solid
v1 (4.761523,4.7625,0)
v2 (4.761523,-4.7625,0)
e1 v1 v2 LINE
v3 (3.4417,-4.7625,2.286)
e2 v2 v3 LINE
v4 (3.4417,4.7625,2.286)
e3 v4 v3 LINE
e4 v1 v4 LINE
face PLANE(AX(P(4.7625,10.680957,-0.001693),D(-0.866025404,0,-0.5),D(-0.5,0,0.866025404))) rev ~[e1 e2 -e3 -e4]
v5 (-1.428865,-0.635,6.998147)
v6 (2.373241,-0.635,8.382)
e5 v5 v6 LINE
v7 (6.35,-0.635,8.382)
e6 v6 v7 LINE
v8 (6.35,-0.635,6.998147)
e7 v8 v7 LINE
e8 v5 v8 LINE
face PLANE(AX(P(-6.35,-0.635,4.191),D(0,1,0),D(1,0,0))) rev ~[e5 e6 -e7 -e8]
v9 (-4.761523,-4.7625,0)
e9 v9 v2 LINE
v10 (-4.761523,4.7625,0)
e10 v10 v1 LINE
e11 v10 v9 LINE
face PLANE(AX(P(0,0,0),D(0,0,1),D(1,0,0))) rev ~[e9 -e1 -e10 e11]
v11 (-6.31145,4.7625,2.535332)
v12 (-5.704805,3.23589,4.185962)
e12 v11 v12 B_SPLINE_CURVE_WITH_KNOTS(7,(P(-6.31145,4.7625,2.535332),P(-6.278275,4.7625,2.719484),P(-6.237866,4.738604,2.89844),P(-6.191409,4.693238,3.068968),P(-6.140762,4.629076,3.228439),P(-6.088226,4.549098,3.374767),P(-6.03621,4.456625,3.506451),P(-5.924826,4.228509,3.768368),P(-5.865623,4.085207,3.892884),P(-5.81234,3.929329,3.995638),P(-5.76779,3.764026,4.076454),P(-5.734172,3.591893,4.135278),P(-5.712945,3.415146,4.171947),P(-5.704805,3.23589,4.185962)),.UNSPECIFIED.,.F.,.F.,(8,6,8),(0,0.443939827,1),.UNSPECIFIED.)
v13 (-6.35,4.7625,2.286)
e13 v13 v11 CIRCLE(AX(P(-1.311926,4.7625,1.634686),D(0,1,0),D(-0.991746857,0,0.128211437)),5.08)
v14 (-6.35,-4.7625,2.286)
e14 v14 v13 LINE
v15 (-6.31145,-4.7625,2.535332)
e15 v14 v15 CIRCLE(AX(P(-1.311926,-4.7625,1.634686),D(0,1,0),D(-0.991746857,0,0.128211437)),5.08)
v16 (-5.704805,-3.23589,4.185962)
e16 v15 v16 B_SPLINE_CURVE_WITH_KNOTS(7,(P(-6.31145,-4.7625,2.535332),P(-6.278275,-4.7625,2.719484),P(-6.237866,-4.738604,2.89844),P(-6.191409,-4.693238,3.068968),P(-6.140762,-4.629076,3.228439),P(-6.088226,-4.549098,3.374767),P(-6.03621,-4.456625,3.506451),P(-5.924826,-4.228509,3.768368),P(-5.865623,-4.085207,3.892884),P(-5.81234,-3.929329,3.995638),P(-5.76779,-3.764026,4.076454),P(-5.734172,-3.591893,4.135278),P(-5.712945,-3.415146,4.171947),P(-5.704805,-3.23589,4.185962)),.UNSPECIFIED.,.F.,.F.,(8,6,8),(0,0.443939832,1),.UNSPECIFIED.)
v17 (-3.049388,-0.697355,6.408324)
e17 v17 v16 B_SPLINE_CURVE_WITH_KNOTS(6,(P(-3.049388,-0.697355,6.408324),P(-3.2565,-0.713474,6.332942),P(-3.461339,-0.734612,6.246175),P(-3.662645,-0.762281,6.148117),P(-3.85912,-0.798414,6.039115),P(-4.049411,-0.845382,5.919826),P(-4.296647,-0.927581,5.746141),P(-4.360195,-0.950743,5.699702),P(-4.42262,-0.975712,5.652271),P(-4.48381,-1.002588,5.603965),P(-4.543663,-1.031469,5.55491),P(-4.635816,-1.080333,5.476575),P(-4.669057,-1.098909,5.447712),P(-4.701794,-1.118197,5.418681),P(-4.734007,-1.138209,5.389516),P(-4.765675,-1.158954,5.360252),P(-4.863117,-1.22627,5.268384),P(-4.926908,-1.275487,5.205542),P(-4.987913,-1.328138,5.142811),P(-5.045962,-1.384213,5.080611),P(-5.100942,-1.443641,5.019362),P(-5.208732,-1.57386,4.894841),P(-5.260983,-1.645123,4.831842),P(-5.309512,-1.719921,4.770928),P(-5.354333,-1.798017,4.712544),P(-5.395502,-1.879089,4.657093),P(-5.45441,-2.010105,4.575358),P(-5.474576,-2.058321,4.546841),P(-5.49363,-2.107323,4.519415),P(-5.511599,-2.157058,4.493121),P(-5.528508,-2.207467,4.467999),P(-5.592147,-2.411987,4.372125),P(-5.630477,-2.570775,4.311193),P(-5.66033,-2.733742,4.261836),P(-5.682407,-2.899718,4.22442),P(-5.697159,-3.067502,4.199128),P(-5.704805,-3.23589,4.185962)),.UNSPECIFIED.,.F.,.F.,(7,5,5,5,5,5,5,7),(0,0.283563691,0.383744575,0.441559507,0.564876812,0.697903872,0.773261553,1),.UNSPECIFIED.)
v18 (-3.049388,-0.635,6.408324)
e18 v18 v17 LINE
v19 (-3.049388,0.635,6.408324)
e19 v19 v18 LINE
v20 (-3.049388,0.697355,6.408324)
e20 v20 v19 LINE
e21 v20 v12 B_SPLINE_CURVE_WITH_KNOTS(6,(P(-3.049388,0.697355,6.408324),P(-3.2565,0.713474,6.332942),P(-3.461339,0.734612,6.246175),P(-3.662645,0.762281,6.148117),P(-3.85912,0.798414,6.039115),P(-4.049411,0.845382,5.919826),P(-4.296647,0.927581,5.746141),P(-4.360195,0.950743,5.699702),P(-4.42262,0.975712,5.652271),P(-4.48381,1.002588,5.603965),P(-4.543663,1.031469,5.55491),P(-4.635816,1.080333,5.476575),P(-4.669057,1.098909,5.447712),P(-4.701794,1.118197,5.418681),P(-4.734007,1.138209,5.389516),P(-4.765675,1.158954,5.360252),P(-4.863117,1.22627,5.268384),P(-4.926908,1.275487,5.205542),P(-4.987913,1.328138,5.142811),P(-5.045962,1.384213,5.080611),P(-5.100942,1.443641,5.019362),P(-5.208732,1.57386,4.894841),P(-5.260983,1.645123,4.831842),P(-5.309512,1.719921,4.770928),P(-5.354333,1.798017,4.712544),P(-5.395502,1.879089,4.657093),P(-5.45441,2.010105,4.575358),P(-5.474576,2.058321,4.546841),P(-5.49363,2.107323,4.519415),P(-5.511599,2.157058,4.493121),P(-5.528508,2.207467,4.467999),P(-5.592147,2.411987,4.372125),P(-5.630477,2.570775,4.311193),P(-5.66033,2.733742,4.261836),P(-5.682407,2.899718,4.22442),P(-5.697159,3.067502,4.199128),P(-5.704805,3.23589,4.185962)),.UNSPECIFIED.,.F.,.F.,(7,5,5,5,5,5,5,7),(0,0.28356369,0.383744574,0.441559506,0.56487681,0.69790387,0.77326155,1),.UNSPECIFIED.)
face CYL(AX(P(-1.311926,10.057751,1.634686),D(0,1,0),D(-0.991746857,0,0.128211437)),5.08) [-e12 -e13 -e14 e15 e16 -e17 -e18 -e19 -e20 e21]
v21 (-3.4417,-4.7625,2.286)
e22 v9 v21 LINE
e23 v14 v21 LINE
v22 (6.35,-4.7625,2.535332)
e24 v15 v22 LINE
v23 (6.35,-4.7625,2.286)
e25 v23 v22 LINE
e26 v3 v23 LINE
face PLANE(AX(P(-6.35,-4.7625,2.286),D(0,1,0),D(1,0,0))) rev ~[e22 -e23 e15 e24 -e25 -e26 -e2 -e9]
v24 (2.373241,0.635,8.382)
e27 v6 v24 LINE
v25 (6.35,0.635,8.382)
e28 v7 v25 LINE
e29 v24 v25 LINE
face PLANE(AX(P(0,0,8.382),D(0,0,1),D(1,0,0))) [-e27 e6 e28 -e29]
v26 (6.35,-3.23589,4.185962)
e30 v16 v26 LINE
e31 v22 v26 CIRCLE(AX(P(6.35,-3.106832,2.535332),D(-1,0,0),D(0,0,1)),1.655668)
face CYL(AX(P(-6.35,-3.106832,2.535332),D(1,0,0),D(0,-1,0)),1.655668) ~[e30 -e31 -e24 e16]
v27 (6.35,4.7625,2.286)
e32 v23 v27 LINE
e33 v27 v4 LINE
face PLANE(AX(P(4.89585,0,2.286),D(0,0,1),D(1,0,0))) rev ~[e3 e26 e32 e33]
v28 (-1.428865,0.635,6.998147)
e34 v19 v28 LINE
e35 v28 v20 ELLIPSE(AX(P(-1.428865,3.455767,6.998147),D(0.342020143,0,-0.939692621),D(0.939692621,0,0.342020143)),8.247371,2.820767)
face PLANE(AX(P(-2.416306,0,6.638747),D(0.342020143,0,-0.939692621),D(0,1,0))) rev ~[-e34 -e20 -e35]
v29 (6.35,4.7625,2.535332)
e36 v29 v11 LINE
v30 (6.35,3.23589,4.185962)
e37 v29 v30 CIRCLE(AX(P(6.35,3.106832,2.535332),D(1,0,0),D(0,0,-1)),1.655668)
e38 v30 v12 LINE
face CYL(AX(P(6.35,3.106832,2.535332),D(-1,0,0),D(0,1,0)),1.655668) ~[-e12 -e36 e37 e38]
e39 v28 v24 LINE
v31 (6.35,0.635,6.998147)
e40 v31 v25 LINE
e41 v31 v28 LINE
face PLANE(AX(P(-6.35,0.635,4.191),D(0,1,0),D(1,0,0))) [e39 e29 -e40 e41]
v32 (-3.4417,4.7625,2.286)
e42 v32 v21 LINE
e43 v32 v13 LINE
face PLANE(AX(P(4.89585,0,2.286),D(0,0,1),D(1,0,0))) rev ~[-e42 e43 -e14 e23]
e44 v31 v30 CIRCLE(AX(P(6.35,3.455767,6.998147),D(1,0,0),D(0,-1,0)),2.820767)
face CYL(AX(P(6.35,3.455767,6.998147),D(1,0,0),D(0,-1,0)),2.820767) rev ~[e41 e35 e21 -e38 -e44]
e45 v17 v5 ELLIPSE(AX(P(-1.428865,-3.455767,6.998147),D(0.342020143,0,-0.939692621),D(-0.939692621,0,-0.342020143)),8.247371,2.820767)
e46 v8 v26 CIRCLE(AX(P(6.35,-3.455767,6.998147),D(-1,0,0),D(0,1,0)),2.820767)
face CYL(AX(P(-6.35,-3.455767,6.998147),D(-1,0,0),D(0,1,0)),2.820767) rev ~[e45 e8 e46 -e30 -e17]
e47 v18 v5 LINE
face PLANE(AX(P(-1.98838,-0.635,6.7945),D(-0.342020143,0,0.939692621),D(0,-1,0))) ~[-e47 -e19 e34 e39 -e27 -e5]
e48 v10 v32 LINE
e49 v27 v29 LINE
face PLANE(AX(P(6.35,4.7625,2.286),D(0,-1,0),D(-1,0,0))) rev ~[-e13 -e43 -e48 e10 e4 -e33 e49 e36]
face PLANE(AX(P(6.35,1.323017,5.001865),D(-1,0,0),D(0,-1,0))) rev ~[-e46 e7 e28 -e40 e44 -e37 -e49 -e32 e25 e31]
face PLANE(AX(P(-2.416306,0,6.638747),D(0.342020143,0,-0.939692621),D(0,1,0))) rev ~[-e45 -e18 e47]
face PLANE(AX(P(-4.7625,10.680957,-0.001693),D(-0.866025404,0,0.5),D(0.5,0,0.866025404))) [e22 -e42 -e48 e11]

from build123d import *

# Parameters (mm, degrees)
F0_W         = 9.525
F0_H         = 9.525
F1_DEPTH     = 2.286
F2_T1_DEPTH  = 21.3619144247
F3_W         = 2.9083
F3_H         = 9.525
F3_W_2       = 6.8834
F4_DEPTH     = 1.905
F5_R         = 1.6556676611
F6_W         = 12.7
F6_H         = 1.27
F7_DEPTH     = 4.191
F8_SIZE2     = 8.7232408068
F8_SIZE      = 3.175
F9_T4_DEPTH  = 12.7
F9_T9_DEPTH  = 12.7
F10_T1_DEPTH = 20.1155023365


# Not quite as in the source:
# - a fillet or chamfer that OpenCascade refuses, or shapes differently, is made with other operations: its cross-section is extruded or revolved along the edge and cut away or added


with BuildPart() as f1:
    # F0 (on Top) → F1 (new body)
    with BuildSketch(Plane.XY):
        Rectangle(F0_W, F0_H)
    extrude(amount=F1_DEPTH)

    # F2: chamfer of 1.3208 x 2.2876927066 on 2 edges, made by hand

    # F2_s2 → F2_t1 (cut)
    with BuildSketch(Plane.XZ.offset(-10.6809572123)):
        Polygon((-4.7625, -0.0016927066), (-3.4417, 2.286), (-4.7625, 2.286), align=None)
        Polygon((4.7625, -0.0016927066), (3.4417, 2.286), (4.7625, 2.286), align=None)
    extrude(amount=F2_T1_DEPTH, mode=Mode.SUBTRACT)

    # F3 (on face) → F4 (join)
    with BuildSketch(Plane.XY.offset(2.286)):
        with Locations((4.89585, 0)):
            Rectangle(F3_W, F3_H)
        Rectangle(F3_W_2, F3_H)
        with Locations((-4.89585, 0)):
            Rectangle(F3_W, F3_H)
    extrude(amount=F4_DEPTH)

    # F5
    f5_edges = [f1.edges().sort_by_distance(p)[0] for p in [
        (0, 4.7625, 4.191),
        (0, -4.7625, 4.191),
    ]]
    fillet(f5_edges, radius=F5_R)

    # F6 (on face) → F7 (join)
    with BuildSketch(Plane.XY.offset(4.191)):
        Rectangle(F6_W, F6_H)
    extrude(amount=F7_DEPTH)

    # F8
    f8_edges = [f1.edges().sort_by_distance(p)[0] for p in [
        (-6.35, 0, 8.382),
    ]]
    f8_side = f1.faces().sort_by_distance((-6.35, 0, 3.935532))[0]
    chamfer(f8_edges, length=F8_SIZE, length2=F8_SIZE2, reference=f8_side)

    # F9: fillet of radius 2.8207671263 on 2 edges, made by hand


with BuildPart() as f9_tool2:
    # F9_s3 → F9_t4 (new body)
    with BuildSketch(Plane.YZ.offset(-6.35)):
        with BuildLine():
            ThreePointArc((-0.635, 6.9981468006), (-1.3849039981, 5.0828783899), (-3.235890411, 4.1859623453))
            Line((-3.235890411, 4.1859623453), (-3.2139027394, 3.9047438998))
            ThreePointArc((-3.2139027394, 3.9047438998), (-3.1068323389, 3.9089232874), (-0.635, 3.9089232874))
            Line((-0.635, 3.9089232874), (-0.3529232874, 4.191))
            Line((-0.3529232874, 4.191), (-0.3529232874, 6.9981468006))
            Line((-0.3529232874, 6.9981468006), (-0.635, 6.9981468006))
        make_face()
    extrude(amount=F9_T4_DEPTH)

    split(bisect_by=Plane(origin=(-2.4163064349, 0, 6.6387473684), x_dir=(0, 1, 0), z_dir=(0.3420201433, 0, -0.9396926208)), keep=Keep.TOP)


with BuildPart() as f1_1:
    add(f1.part)

    # F9_t1: union F9_tool2
    add(f9_tool2.part)


with BuildPart() as f9_tool7:
    # F9_s8 → F9_t9 (new body)
    with BuildSketch(Plane.YZ.offset(6.35)):
        with BuildLine():
            ThreePointArc((0.635, 6.9981468006), (1.3849039981, 5.0828783899), (3.235890411, 4.1859623453))
            Line((3.235890411, 4.1859623453), (3.2139027394, 3.9047438998))
            ThreePointArc((3.2139027394, 3.9047438998), (3.1068323389, 3.9089232874), (0.635, 3.9089232874))
            Line((0.635, 3.9089232874), (0.3529232874, 4.191))
            Line((0.3529232874, 4.191), (0.3529232874, 6.9981468006))
            Line((0.3529232874, 6.9981468006), (0.635, 6.9981468006))
        make_face()
    extrude(amount=-F9_T9_DEPTH)

    split(bisect_by=Plane(origin=(-2.4163064349, 0, 6.6387473684), x_dir=(0, 1, 0), z_dir=(0.3420201433, 0, -0.9396926208)), keep=Keep.TOP)


with BuildPart() as f1_2:
    add(f1_1.part)

    # F9_t6: union F9_tool7
    add(f9_tool7.part)

    # F10: fillet of radius 5.08 on 1 edges, made by hand

    # F10_s2 → F10_t1 (cut)
    with BuildSketch(Plane.XZ.offset(-10.0577511683)):
        with BuildLine():
            ThreePointArc((-6.35, 2.286), (-5.2774477357, 4.8097508006), (-3.0493882968, 6.4083244148))
            Line((-3.0493882968, 6.4083244148), (-3.0841375434, 6.5037971851))
            Line((-3.0841375434, 6.5037971851), (-6.3847492466, 5.3024727703))
            Line((-6.3847492466, 5.3024727703), (-6.4516, 5.207))
            ThreePointArc((-6.4516, 5.207), (-6.4516, 3.7465), (-6.4507614806, 2.299026282))
            Line((-6.4507614806, 2.299026282), (-6.35, 2.286))
        make_face()
    extrude(amount=F10_T1_DEPTH, mode=Mode.SUBTRACT)


solid = f1_2.part
